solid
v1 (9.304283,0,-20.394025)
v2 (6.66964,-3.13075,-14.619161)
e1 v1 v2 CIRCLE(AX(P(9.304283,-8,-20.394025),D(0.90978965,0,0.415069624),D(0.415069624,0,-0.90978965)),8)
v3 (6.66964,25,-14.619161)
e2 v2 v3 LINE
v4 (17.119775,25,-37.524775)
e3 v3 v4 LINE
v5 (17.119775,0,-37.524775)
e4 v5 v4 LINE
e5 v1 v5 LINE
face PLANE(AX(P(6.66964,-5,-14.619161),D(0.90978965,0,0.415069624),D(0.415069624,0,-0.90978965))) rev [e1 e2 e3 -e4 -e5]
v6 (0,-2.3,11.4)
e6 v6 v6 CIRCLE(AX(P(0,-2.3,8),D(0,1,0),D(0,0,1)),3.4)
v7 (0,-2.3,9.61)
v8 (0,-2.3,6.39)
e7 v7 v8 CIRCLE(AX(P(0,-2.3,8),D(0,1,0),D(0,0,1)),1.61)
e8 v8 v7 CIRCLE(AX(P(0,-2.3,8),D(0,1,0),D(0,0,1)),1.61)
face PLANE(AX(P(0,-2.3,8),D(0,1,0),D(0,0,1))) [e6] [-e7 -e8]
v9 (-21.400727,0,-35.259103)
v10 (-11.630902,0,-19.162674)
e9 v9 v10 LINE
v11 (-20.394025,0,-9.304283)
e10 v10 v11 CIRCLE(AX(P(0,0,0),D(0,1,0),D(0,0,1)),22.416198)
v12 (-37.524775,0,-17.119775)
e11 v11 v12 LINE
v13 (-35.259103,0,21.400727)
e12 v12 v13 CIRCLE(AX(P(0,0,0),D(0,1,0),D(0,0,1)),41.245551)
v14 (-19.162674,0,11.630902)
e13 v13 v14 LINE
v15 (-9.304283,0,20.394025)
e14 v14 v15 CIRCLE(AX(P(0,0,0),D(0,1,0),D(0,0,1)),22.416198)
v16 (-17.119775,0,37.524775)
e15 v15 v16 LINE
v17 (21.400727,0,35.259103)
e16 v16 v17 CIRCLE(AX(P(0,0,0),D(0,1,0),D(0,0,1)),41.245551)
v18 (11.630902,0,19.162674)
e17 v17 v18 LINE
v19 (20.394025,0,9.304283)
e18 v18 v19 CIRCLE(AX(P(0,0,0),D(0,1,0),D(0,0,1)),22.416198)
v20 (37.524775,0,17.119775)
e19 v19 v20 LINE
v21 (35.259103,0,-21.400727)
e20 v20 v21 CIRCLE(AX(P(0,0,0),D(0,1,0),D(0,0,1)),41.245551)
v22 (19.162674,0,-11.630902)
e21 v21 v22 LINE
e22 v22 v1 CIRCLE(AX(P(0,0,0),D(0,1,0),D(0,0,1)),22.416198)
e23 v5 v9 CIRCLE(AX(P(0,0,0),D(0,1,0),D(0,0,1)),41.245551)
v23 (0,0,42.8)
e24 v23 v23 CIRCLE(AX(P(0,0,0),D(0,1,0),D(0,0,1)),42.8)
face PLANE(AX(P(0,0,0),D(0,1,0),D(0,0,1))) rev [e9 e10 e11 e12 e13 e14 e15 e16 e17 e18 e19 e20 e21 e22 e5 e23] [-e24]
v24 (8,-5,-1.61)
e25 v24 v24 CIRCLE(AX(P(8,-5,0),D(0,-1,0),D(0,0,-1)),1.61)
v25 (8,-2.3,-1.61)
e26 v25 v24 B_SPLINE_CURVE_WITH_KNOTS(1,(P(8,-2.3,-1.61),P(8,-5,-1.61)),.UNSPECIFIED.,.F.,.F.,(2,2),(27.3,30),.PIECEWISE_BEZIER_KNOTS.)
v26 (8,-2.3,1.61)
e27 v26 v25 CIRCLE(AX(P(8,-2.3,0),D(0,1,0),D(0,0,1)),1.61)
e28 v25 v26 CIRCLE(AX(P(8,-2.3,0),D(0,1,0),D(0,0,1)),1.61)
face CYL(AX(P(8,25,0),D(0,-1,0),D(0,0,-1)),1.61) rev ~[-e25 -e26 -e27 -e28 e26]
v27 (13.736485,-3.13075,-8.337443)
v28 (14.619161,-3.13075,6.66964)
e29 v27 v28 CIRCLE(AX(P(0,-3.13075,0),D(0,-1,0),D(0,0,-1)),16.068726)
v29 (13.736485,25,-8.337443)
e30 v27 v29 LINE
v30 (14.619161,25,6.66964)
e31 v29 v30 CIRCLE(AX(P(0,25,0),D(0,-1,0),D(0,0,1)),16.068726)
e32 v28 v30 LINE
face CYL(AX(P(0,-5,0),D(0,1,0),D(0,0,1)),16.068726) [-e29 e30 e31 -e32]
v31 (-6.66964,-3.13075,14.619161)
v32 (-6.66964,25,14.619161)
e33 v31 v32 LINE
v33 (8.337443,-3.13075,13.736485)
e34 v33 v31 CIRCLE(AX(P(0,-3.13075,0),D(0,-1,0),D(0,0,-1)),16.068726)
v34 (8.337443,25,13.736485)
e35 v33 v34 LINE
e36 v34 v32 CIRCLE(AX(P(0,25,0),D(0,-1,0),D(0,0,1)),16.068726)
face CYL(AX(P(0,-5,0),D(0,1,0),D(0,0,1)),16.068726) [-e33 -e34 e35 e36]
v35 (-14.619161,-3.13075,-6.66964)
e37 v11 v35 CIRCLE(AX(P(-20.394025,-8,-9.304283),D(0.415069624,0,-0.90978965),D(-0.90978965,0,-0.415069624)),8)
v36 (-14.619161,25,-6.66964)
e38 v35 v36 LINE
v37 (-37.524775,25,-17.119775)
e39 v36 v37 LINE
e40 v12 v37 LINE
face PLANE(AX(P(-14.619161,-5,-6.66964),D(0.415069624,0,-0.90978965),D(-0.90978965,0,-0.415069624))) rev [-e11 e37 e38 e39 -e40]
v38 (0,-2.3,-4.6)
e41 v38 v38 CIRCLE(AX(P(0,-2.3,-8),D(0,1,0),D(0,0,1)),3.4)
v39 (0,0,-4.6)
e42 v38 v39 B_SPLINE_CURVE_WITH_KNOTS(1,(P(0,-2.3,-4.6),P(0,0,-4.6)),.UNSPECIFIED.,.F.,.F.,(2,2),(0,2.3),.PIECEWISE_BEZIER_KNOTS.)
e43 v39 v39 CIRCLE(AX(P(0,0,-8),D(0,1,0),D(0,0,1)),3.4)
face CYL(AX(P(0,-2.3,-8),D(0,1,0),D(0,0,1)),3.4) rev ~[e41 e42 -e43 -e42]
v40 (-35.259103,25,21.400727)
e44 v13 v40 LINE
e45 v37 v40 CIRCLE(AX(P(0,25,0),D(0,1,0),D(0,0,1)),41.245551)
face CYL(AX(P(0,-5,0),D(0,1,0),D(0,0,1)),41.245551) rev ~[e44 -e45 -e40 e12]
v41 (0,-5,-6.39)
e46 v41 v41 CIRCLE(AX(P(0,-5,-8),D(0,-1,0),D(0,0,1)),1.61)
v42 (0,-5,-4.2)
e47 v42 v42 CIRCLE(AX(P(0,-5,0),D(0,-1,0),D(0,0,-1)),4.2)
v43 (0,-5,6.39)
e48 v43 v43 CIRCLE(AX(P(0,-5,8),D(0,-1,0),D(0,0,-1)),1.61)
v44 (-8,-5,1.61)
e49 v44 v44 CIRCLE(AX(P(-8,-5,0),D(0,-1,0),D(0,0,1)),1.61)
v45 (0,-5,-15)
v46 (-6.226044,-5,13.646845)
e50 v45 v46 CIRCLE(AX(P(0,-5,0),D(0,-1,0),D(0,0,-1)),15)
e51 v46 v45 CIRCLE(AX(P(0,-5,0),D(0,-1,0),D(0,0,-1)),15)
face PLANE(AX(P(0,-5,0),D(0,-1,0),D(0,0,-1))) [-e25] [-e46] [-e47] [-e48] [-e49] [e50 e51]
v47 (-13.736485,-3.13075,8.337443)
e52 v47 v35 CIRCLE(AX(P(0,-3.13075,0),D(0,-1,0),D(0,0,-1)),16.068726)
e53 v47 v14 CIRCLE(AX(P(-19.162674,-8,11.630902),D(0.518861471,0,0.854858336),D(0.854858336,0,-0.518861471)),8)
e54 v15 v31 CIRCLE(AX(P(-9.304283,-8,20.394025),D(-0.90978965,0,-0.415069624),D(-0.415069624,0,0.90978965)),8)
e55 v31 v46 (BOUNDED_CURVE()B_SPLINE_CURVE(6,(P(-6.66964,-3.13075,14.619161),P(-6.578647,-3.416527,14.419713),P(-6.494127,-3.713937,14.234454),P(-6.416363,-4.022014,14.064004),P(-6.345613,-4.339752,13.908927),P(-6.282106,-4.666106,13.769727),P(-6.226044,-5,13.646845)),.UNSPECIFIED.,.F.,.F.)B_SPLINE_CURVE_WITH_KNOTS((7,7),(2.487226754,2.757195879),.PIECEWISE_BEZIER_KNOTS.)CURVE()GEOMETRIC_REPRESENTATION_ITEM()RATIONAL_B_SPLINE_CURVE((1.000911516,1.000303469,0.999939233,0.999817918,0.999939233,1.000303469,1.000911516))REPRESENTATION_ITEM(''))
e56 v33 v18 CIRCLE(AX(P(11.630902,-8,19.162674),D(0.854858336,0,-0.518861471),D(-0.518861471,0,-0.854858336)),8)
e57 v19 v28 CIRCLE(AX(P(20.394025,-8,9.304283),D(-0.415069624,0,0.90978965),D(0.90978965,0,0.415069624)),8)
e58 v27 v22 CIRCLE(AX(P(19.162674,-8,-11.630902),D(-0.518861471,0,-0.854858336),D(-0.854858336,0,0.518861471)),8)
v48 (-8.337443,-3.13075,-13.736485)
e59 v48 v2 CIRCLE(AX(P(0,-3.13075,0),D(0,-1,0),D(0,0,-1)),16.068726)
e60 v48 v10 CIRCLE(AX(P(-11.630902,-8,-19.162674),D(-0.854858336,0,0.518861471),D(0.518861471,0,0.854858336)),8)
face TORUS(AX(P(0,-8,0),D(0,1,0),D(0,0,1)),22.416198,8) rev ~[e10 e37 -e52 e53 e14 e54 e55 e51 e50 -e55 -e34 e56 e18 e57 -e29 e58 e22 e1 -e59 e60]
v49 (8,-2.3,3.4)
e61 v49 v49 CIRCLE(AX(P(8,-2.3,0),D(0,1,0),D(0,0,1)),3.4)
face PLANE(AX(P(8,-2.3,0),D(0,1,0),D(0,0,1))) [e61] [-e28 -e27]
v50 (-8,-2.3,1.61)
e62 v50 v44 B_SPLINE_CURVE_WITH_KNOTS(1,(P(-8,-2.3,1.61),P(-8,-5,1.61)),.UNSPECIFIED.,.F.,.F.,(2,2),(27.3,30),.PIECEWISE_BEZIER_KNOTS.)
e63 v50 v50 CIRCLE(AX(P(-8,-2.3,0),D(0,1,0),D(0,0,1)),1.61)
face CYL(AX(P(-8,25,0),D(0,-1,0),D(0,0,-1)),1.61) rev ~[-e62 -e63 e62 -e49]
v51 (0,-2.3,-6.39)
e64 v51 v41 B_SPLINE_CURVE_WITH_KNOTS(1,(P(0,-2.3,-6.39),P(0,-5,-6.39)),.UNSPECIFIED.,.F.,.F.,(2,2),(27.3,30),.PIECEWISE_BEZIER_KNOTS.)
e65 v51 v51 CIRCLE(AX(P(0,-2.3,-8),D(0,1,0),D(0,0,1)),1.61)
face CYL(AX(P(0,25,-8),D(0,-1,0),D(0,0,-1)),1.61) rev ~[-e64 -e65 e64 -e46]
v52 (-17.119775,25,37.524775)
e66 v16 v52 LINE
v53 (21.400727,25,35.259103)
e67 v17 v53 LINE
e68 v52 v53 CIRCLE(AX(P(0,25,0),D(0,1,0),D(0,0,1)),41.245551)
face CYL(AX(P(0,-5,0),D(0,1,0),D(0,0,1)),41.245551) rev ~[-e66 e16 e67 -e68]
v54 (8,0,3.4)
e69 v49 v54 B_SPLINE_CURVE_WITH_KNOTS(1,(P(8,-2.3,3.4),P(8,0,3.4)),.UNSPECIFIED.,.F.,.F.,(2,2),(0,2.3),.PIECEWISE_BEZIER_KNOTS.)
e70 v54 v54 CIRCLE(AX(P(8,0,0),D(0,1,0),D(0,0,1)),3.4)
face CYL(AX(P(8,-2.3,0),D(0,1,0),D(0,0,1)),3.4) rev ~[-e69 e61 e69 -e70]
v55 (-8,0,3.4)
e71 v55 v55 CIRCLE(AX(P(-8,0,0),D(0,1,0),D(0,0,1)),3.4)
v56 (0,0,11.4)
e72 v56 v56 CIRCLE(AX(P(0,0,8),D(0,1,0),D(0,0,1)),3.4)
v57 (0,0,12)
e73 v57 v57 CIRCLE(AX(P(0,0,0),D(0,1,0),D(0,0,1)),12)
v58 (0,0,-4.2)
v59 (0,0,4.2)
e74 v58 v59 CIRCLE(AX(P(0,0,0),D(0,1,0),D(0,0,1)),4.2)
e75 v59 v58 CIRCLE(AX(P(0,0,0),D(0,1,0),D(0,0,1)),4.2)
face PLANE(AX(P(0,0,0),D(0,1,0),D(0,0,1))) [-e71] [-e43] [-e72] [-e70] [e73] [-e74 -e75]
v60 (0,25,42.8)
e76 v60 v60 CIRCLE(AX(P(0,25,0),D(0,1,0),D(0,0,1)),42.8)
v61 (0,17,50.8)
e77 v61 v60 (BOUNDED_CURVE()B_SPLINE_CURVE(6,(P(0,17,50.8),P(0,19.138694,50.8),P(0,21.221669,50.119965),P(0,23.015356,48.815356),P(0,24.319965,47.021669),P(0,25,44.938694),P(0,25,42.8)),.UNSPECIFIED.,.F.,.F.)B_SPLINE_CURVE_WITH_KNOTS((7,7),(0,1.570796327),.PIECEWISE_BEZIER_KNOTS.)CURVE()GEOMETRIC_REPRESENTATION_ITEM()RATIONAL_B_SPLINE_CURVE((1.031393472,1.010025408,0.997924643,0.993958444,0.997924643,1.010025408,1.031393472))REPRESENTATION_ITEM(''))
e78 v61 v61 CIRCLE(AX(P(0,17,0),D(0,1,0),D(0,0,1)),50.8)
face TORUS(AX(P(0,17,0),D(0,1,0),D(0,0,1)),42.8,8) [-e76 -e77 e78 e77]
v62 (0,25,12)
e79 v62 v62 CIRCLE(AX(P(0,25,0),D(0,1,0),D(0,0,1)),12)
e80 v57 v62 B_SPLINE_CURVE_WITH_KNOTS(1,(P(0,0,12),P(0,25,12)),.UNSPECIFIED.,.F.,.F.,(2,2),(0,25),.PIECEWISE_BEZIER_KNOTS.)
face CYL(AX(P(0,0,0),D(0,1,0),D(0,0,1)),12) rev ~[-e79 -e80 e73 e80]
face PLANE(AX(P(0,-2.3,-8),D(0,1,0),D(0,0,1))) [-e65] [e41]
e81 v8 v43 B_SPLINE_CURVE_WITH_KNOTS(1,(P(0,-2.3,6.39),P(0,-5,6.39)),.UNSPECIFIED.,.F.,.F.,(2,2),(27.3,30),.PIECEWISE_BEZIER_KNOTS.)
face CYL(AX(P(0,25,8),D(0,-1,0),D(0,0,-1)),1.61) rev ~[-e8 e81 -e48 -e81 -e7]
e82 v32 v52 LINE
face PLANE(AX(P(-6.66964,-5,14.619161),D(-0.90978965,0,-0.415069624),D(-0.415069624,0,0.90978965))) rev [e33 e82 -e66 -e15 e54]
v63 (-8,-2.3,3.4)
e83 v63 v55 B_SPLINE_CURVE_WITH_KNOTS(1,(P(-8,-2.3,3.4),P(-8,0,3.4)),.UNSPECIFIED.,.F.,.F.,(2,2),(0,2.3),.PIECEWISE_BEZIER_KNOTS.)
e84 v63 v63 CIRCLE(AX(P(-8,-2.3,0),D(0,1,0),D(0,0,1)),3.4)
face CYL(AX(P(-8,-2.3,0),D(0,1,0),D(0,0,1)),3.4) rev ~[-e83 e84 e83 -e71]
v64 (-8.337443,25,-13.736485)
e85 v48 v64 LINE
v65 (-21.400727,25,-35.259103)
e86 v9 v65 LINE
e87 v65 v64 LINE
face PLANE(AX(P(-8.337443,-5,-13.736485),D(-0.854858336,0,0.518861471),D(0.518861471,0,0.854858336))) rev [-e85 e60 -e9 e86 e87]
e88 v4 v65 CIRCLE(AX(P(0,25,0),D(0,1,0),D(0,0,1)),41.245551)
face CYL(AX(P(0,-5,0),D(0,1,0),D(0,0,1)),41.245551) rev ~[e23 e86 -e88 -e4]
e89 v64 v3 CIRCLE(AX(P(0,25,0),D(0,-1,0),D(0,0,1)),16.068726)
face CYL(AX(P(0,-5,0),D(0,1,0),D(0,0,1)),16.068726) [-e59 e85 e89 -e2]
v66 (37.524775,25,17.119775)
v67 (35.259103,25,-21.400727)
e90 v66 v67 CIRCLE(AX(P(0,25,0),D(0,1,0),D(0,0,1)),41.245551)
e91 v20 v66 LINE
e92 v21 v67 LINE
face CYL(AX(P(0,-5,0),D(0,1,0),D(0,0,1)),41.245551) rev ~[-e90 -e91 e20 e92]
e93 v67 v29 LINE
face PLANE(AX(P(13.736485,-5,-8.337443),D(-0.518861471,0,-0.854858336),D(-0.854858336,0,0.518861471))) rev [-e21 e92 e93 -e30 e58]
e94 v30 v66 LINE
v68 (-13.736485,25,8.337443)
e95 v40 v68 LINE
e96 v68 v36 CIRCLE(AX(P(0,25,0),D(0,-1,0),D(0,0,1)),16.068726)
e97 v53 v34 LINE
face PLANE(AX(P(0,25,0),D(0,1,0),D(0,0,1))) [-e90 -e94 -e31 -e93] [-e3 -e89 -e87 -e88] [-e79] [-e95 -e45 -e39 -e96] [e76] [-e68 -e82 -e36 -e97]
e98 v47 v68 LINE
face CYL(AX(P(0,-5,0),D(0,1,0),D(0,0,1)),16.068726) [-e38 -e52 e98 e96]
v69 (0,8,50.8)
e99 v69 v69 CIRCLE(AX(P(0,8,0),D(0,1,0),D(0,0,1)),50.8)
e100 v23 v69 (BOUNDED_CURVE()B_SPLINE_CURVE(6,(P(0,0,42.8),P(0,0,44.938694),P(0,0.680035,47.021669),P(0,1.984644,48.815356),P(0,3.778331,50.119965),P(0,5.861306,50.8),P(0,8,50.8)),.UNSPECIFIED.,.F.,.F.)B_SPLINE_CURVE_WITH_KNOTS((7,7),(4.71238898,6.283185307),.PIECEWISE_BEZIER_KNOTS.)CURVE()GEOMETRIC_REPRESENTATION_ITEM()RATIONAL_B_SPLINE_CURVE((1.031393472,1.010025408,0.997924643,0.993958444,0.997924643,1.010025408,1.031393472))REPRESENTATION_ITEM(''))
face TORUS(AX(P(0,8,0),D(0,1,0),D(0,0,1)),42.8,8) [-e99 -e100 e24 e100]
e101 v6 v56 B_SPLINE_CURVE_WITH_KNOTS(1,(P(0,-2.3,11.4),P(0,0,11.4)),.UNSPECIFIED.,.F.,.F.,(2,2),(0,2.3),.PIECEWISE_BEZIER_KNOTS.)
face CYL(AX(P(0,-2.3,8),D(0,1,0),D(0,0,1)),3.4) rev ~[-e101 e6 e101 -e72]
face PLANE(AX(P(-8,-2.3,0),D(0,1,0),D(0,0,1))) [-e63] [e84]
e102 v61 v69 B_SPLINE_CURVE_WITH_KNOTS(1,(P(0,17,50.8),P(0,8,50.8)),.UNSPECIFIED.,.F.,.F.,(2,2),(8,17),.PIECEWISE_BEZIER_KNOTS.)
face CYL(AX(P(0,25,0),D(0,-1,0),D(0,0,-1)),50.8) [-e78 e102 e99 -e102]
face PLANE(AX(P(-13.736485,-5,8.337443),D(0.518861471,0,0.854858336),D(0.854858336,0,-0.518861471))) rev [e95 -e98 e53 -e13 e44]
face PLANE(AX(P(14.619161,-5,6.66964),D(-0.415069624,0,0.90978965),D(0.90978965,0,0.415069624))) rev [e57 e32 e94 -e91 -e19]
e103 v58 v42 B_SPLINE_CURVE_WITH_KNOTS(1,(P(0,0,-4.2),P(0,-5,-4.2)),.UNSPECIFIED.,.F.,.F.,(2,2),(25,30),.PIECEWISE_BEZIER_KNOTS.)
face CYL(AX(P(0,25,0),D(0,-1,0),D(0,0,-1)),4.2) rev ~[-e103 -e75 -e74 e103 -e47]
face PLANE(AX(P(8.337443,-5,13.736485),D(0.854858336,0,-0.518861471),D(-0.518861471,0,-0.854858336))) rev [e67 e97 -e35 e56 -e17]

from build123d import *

# Parameters (mm, degrees)
SKETCH1_R           = 50.8
BOSS_EXTRUDE1_DEPTH = 25
FILLET2_R           = 8
FILLET3_R           = 8
SKETCH2_R           = 15
BOSS_EXTRUDE2_DEPTH = 5
SKETCH3_R           = 12
CUT_EXTRUDE1_DEPTH  = 25
FILLET4_R           = 8
SKETCH5_R           = 1.61
SKETCH5_R_2         = 4.2
CUT_EXTRUDE2_DEPTH  = 78.85422275
CUT_EXTRUDE3_DEPTH  = 78.85422275
SKETCH7_R           = 3.4
CUT_EXTRUDE4_DEPTH  = 2.3


with BuildPart() as part:
    # Sketch1 → Boss-Extrude1 (new body)
    with BuildSketch(Plane(origin=(0, 0, 0), x_dir=(1, 0, 0), z_dir=(0, 1, 0))):
        with Locations(Location((0, 0, 0), (0, 0, 270))):
            Circle(SKETCH1_R)
    extrude(amount=BOSS_EXTRUDE1_DEPTH)

    # Fillet2
    fillet2_edges = [part.edges().sort_by_distance(p)[0] for p in [
        (0, 25, -50.8),
    ]]
    fillet(fillet2_edges, radius=FILLET2_R)

    # Fillet3
    fillet3_edges = [part.edges().sort_by_distance(p)[0] for p in [
        (0, 0, -50.8),
    ]]
    fillet(fillet3_edges, radius=FILLET3_R)

    # Sketch2 → Boss-Extrude2 (add)
    with BuildSketch(Plane.XZ):
        with Locations(Location((0, 0, 0), (0, 0, 90))):
            Circle(SKETCH2_R)
    extrude(amount=BOSS_EXTRUDE2_DEPTH)

    # Sketch3 → Cut-Extrude1 (cut)
    with BuildSketch(Plane(origin=(0, 25, 0), x_dir=(1, 0, 0), z_dir=(0, 1, 0))):
        with Locations(Location((0, 0, 0), (0, 0, 270))):
            Circle(SKETCH3_R)
    extrude(amount=-CUT_EXTRUDE1_DEPTH, mode=Mode.SUBTRACT)

    # Fillet4
    # the kernel refuses this fillet: 8 mm, written as the material it adds along each edge
    with BuildSketch(Plane(origin=(0, 0, 0), x_dir=(0, 0, 1), z_dir=(1, 0, 0))) as fillet4_piece_1:
        with BuildLine():
            CenterArc((22.416198487, 8), FILLET4_R, 202.024312837, 67.975687163)
            Line((15, 5), (14.85167603, 4.94))
            ThreePointArc((14.85167603, 4.94), (14.84, 2.5), (14.84, 0))
            Line((14.84, 0), (15, -0.16))
            Line((15, -0.16), (22.416198487, -0.16))
            Line((22.416198487, -0.16), (22.416198487, 0))
        make_face()
    revolve(axis=Axis((0, 0, 0), (0, -1, 0)))

    # Sketch5 → Cut-Extrude2 (cut, through all)
    with BuildSketch(Plane.XZ.offset(5)):
        with Locations(Location((0, 8, 0), (0, 0, 270))):
            Circle(SKETCH5_R)
        with Locations(Location((0, -8, 0), (0, 0, 90))):
            Circle(SKETCH5_R)
        with Locations(Location((8, 0, 0), (0, 0, 270))):
            Circle(SKETCH5_R)
        with Locations(Location((-8, 0, 0), (0, 0, 90))):
            Circle(SKETCH5_R)
        with Locations(Location((0, 0, 0), (0, 0, 270))):
            Circle(SKETCH5_R_2)
    extrude(amount=-CUT_EXTRUDE2_DEPTH, mode=Mode.SUBTRACT)

    # Sketch6 → Cut-Extrude3 (cut, through all)
    with BuildSketch(Plane(origin=(0, 25, 0), x_dir=(1, 0, 0), z_dir=(0, 1, 0))):
        with BuildLine():
            Line((6.669640143, 14.619160774), (17.119775233, 37.524775128))
            ThreePointArc((17.119775233, 37.524775128), (-2.42176691, 41.174391282), (-21.4007271, 35.259102825))
            Line((-21.4007271, 35.259102825), (-8.337442905, 13.736484528))
            ThreePointArc((-8.337442905, 13.736484528), (-0.943488661, 16.041003414), (6.669640143, 14.619160774))
        make_face()
        with BuildLine():
            Line((13.736484528, 8.337442905), (35.259102825, 21.4007271))
            ThreePointArc((35.259102825, 21.4007271), (41.174391282, 2.42176691), (37.524775128, -17.119775233))
            Line((37.524775128, -17.119775233), (14.619160774, -6.669640143))
            ThreePointArc((14.619160774, -6.669640143), (16.041003414, 0.943488661), (13.736484528, 8.337442905))
        make_face()
        with BuildLine():
            Line((8.337442905, -13.736484528), (21.4007271, -35.259102825))
            ThreePointArc((21.4007271, -35.259102825), (2.42176691, -41.174391282), (-17.119775233, -37.524775128))
            Line((-17.119775233, -37.524775128), (-6.669640143, -14.619160774))
            ThreePointArc((-6.669640143, -14.619160774), (0.943488661, -16.041003414), (8.337442905, -13.736484528))
        make_face()
        with BuildLine():
            Line((-13.736484528, -8.337442905), (-35.259102825, -21.4007271))
            ThreePointArc((-35.259102825, -21.4007271), (-41.174391282, -2.42176691), (-37.524775128, 17.119775233))
            Line((-37.524775128, 17.119775233), (-14.619160774, 6.669640143))
            ThreePointArc((-14.619160774, 6.669640143), (-16.041003414, -0.943488661), (-13.736484528, -8.337442905))
        make_face()
    extrude(amount=-CUT_EXTRUDE3_DEPTH, mode=Mode.SUBTRACT)

    # Sketch7 → Cut-Extrude4 (cut)
    with BuildSketch(Plane(origin=(0, 0, 0), x_dir=(1, 0, 0), z_dir=(0, 1, 0))):
        with Locations(Location((-8, 0, 0), (0, 0, 270))):
            Circle(SKETCH7_R)
        with Locations(Location((0, 8, 0), (0, 0, 270))):
            Circle(SKETCH7_R)
        with Locations(Location((8, 0, 0), (0, 0, 270))):
            Circle(SKETCH7_R)
        with Locations(Location((0, -8, 0), (0, 0, 270))):
            Circle(SKETCH7_R)
    extrude(amount=-CUT_EXTRUDE4_DEPTH, mode=Mode.SUBTRACT)


solid = part.part
